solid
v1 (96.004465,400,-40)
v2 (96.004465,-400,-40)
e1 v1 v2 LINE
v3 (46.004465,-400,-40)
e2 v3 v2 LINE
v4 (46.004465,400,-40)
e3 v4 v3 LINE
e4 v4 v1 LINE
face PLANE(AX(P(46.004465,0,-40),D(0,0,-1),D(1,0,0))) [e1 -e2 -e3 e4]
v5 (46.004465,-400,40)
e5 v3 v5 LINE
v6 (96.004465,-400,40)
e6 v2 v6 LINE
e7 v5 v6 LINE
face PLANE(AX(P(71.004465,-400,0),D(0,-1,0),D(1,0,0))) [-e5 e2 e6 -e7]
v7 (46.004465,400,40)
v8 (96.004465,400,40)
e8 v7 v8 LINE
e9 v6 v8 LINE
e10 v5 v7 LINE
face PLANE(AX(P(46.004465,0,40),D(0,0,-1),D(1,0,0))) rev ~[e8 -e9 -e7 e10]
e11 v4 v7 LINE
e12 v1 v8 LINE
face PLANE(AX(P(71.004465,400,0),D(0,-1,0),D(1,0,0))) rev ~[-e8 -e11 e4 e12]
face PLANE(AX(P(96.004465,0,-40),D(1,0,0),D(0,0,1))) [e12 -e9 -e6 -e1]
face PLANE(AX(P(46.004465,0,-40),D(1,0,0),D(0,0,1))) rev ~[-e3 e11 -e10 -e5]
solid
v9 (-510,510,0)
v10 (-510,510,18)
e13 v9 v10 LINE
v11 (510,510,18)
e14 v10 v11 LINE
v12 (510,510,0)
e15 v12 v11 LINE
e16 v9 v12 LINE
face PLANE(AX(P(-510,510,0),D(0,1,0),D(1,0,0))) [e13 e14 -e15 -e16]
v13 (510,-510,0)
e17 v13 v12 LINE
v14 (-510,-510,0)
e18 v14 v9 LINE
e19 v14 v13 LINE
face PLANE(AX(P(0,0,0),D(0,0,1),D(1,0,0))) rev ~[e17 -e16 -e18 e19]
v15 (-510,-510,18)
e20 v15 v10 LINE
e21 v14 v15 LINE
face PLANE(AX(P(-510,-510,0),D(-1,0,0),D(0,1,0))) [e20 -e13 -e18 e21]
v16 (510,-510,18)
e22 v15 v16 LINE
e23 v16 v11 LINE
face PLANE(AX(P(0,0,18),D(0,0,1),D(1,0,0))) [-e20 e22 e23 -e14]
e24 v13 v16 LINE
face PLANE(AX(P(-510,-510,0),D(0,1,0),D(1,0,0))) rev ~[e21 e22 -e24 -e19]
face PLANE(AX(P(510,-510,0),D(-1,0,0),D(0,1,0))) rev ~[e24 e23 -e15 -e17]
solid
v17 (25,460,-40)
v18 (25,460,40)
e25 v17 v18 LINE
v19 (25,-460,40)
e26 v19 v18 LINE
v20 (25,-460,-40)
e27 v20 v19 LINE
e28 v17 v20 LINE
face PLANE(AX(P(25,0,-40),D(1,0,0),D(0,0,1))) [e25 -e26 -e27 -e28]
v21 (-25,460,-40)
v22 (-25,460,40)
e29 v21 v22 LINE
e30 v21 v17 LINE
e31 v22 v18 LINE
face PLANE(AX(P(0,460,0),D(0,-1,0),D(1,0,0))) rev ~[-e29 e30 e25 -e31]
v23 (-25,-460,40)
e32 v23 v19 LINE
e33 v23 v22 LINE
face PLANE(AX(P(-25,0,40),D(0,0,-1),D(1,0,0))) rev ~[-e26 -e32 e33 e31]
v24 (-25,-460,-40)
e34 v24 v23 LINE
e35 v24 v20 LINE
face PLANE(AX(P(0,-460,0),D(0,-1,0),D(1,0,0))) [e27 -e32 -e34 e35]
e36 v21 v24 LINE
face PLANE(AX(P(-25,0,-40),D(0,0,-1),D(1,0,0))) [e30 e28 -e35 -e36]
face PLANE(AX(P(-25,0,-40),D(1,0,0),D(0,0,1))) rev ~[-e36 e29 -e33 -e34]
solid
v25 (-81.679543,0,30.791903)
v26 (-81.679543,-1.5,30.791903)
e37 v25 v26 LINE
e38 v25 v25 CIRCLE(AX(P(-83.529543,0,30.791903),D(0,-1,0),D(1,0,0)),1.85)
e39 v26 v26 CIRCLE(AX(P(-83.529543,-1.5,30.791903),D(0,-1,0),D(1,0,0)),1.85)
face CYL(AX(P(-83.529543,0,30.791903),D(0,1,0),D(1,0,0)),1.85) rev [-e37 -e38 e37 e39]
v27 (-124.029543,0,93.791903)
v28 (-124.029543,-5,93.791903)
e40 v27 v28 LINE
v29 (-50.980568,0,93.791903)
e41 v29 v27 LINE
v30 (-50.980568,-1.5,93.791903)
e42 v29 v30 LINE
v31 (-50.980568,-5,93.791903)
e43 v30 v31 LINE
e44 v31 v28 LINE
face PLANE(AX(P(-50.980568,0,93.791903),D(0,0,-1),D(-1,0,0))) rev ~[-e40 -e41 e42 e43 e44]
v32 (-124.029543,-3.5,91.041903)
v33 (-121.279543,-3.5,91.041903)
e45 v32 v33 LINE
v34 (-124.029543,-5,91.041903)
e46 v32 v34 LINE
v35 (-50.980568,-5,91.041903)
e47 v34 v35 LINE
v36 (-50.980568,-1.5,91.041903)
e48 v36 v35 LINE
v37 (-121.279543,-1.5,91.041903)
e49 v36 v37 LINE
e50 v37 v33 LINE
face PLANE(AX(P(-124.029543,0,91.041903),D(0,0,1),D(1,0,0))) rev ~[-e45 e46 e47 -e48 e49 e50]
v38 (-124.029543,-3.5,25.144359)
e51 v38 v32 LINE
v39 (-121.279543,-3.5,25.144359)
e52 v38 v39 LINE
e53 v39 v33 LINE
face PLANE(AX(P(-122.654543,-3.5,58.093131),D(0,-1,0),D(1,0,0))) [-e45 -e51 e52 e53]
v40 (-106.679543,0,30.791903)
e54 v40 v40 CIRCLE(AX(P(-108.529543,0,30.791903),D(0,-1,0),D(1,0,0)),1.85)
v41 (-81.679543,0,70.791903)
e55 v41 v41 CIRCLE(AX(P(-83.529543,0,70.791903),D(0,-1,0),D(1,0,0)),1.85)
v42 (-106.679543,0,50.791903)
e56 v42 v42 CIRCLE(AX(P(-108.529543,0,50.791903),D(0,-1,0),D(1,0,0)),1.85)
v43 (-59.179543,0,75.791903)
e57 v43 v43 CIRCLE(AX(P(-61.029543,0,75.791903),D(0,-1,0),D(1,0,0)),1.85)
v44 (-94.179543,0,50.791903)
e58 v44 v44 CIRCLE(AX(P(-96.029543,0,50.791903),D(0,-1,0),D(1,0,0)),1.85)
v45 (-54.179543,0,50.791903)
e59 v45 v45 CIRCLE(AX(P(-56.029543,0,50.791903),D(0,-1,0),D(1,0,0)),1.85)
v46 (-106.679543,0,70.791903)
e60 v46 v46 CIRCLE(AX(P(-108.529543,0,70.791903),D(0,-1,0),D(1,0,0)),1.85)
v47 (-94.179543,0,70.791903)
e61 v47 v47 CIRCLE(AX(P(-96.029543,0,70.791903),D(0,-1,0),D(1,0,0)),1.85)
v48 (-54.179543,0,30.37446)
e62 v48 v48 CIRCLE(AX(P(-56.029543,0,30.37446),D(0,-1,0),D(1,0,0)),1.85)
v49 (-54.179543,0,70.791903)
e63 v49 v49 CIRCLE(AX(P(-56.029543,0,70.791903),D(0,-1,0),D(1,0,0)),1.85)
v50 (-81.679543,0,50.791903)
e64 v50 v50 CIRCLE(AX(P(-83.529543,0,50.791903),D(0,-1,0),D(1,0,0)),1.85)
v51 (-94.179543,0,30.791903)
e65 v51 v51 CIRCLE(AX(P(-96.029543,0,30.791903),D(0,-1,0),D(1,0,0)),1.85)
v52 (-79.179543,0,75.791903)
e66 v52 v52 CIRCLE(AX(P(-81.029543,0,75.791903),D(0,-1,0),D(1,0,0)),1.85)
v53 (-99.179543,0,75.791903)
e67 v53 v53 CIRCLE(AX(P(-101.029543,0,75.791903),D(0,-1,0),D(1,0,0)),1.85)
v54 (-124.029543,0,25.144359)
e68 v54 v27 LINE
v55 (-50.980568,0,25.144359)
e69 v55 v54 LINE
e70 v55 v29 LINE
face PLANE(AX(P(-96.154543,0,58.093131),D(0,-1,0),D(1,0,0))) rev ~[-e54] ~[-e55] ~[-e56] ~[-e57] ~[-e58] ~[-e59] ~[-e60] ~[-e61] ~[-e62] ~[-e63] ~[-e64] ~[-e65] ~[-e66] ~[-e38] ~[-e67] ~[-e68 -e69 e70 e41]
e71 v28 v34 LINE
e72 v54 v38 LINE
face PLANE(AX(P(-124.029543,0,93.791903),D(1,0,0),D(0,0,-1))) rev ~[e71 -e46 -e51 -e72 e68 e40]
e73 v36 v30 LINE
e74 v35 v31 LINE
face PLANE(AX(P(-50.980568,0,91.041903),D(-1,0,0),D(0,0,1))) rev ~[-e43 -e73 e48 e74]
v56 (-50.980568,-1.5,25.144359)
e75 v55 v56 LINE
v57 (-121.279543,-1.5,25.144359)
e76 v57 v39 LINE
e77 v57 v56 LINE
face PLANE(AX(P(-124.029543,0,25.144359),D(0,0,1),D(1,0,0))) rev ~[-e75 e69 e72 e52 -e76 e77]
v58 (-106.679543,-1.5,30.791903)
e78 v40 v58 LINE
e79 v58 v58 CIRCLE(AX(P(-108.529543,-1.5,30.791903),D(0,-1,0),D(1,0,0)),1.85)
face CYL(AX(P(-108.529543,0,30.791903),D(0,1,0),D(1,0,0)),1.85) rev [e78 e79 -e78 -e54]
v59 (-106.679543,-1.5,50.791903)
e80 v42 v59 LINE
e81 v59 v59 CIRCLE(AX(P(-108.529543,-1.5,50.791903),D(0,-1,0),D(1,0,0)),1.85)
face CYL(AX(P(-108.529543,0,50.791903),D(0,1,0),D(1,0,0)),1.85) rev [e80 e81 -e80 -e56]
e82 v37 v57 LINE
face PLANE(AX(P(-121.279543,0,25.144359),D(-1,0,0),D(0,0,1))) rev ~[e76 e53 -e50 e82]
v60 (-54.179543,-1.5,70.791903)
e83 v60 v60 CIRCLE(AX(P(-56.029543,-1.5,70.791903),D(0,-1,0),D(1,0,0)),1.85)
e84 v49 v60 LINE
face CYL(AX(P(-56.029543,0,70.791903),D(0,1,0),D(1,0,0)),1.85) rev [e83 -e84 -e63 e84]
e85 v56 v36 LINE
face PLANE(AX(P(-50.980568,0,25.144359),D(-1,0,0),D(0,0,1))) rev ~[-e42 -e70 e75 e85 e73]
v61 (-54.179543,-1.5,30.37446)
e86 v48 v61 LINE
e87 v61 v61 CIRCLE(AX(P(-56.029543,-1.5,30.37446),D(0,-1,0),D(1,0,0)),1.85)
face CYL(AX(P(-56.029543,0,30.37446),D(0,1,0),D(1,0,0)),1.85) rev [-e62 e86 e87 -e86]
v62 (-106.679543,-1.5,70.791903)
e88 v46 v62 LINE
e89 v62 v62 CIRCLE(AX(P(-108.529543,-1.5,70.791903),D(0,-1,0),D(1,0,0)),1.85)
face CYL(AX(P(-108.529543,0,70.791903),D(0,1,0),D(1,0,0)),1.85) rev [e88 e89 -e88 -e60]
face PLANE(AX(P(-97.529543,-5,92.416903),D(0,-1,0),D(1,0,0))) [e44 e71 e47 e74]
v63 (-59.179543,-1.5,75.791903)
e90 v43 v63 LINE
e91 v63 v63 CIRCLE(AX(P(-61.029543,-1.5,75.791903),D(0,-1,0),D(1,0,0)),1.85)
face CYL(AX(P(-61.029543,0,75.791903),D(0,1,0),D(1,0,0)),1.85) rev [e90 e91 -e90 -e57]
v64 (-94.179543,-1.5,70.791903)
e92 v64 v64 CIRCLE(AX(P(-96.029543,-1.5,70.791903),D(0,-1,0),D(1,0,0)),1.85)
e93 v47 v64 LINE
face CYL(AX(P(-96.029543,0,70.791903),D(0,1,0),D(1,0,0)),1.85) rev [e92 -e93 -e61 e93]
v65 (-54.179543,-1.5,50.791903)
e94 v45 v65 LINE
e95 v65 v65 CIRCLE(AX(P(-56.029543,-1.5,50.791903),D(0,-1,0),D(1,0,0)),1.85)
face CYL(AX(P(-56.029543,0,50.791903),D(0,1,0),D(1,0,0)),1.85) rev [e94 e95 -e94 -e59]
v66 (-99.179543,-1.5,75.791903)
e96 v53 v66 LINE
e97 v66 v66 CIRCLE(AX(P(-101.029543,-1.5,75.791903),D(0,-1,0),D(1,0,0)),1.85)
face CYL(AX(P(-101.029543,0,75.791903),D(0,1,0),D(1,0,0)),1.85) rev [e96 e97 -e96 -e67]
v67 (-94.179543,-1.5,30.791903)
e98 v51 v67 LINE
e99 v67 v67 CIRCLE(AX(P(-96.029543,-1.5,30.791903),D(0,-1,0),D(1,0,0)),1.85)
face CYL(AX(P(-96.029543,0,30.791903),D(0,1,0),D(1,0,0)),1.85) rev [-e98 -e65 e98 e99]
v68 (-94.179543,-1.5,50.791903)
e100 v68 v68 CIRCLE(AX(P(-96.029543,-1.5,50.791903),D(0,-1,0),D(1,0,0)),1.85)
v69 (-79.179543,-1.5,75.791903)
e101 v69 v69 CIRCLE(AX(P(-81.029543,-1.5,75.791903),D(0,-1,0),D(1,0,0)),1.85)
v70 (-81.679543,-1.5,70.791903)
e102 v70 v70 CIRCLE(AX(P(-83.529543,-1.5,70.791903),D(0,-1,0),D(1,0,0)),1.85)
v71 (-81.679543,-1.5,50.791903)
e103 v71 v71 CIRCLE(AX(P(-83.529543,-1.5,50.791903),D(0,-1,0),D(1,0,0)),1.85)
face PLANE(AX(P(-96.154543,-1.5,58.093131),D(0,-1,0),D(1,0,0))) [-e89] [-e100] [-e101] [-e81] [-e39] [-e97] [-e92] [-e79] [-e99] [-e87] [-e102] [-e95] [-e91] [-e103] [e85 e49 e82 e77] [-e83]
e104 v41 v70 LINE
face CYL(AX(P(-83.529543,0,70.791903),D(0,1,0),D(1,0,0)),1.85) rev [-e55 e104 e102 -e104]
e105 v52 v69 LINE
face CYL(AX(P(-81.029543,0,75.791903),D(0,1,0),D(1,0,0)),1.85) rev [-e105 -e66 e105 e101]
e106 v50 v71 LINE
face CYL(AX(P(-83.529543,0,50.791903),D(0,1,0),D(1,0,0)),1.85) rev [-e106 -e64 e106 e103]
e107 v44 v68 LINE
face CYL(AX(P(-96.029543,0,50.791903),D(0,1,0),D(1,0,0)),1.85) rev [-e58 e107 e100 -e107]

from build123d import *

# Parameters (mm, degrees)
F0_W     = 50
F0_H     = 80
F1_DEPTH = 460
F2_DEPTH = 400
F3_R     = 1.85
F3_W     = 2.75
F3_H     = 65.8975437433
F3_W_2   = 20.0489750504
F3_H_2   = 2.75
F4_DEPTH = 1.5
F5_DEPTH = 5
F6_DEPTH = 3.5
F7_W     = 1020
F7_H     = 1020
F8_DEPTH = 18


with BuildPart() as f1:
    # F0 (on Front) → F1 (new body, symmetric)
    with BuildSketch(Plane.XZ):
        Rectangle(F0_W, F0_H)
    extrude(amount=F1_DEPTH, both=True)


with BuildPart() as f2:
    # F0 (on Front) → F2 (new body, symmetric)
    with BuildSketch(Plane.XZ):
        with Locations((71.0044652224, 0)):
            Rectangle(F0_W, F0_H)
    extrude(amount=F2_DEPTH, both=True)


with BuildPart() as f4:
    # F3 (on Front) → F4 (new body)
    with BuildSketch(Plane.XZ):
        Polygon((-121.2795429826, 25.1443590969), (-71.0295429826, 25.1443590969), (-71.0295429826, 90.7919028401), (-71.0295429826, 91.0419028401), (-121.2795429826, 91.0419028401), align=None)
        with Locations((-108.5295429826, 30.7919028401)):
            Circle(F3_R, mode=Mode.SUBTRACT)
        with Locations((-96.0295429826, 30.7919028401)):
            Circle(F3_R, mode=Mode.SUBTRACT)
        with Locations((-108.5295429826, 50.7919028401)):
            Circle(F3_R, mode=Mode.SUBTRACT)
        with Locations((-96.0295429826, 50.7919028401)):
            Circle(F3_R, mode=Mode.SUBTRACT)
        with Locations((-83.5295429826, 30.7919028401)):
            Circle(F3_R, mode=Mode.SUBTRACT)
        with Locations((-83.5295429826, 50.7919028401)):
            Circle(F3_R, mode=Mode.SUBTRACT)
        with Locations((-108.5295429826, 70.7919028401)):
            Circle(F3_R, mode=Mode.SUBTRACT)
        with Locations((-101.0295429826, 75.7919028401)):
            Circle(F3_R, mode=Mode.SUBTRACT)
        with Locations((-96.0295429826, 70.7919028401)):
            Circle(F3_R, mode=Mode.SUBTRACT)
        with Locations((-83.5295429826, 70.7919028401)):
            Circle(F3_R, mode=Mode.SUBTRACT)
        with Locations((-81.0295429826, 75.7919028401)):
            Circle(F3_R, mode=Mode.SUBTRACT)
        Polygon((-71.0295429826, 90.7919028401), (-71.0295429826, 25.1443590969), (-50.9805679321, 25.1443590969), (-50.9805679321, 91.0419028401), (-71.0295429826, 91.0419028401), align=None)
        with Locations((-56.0295429826, 30.3744599223)):
            Circle(F3_R, mode=Mode.SUBTRACT)
        with Locations((-56.0295429826, 50.7919028401)):
            Circle(F3_R, mode=Mode.SUBTRACT)
        with Locations((-61.0295429826, 75.7919028401)):
            Circle(F3_R, mode=Mode.SUBTRACT)
        with Locations((-56.0295429826, 70.7919028401)):
            Circle(F3_R, mode=Mode.SUBTRACT)
        with Locations((-122.6545429826, 58.0931309685)):
            Rectangle(F3_W, F3_H)
        Polygon((-121.2795429826, 91.0419028401), (-71.0295429826, 91.0419028401), (-71.0295429826, 93.7919028401), (-124.0295429826, 93.7919028401), (-124.0295429826, 91.0419028401), align=None)
        with Locations((-61.0050554574, 92.4169028401)):
            Rectangle(F3_W_2, F3_H_2)
    extrude(amount=F4_DEPTH)

    # F3 (on Front) → F5 (join)
    with BuildSketch(Plane.XZ):
        Polygon((-121.2795429826, 91.0419028401), (-71.0295429826, 91.0419028401), (-71.0295429826, 93.7919028401), (-124.0295429826, 93.7919028401), (-124.0295429826, 91.0419028401), align=None)
        with Locations((-61.0050554574, 92.4169028401)):
            Rectangle(F3_W_2, F3_H_2)
    extrude(amount=F5_DEPTH)

    # F3 (on Front) → F6 (join)
    with BuildSketch(Plane.XZ):
        with Locations((-122.6545429826, 58.0931309685)):
            Rectangle(F3_W, F3_H)
    extrude(amount=F6_DEPTH)


with BuildPart() as f8:
    # F7 (on Top) → F8 (new body)
    with BuildSketch(Plane.XY):
        Rectangle(F7_W, F7_H)
    extrude(amount=F8_DEPTH)


solid = Compound([f1.part, f2.part, f4.part, f8.part])
